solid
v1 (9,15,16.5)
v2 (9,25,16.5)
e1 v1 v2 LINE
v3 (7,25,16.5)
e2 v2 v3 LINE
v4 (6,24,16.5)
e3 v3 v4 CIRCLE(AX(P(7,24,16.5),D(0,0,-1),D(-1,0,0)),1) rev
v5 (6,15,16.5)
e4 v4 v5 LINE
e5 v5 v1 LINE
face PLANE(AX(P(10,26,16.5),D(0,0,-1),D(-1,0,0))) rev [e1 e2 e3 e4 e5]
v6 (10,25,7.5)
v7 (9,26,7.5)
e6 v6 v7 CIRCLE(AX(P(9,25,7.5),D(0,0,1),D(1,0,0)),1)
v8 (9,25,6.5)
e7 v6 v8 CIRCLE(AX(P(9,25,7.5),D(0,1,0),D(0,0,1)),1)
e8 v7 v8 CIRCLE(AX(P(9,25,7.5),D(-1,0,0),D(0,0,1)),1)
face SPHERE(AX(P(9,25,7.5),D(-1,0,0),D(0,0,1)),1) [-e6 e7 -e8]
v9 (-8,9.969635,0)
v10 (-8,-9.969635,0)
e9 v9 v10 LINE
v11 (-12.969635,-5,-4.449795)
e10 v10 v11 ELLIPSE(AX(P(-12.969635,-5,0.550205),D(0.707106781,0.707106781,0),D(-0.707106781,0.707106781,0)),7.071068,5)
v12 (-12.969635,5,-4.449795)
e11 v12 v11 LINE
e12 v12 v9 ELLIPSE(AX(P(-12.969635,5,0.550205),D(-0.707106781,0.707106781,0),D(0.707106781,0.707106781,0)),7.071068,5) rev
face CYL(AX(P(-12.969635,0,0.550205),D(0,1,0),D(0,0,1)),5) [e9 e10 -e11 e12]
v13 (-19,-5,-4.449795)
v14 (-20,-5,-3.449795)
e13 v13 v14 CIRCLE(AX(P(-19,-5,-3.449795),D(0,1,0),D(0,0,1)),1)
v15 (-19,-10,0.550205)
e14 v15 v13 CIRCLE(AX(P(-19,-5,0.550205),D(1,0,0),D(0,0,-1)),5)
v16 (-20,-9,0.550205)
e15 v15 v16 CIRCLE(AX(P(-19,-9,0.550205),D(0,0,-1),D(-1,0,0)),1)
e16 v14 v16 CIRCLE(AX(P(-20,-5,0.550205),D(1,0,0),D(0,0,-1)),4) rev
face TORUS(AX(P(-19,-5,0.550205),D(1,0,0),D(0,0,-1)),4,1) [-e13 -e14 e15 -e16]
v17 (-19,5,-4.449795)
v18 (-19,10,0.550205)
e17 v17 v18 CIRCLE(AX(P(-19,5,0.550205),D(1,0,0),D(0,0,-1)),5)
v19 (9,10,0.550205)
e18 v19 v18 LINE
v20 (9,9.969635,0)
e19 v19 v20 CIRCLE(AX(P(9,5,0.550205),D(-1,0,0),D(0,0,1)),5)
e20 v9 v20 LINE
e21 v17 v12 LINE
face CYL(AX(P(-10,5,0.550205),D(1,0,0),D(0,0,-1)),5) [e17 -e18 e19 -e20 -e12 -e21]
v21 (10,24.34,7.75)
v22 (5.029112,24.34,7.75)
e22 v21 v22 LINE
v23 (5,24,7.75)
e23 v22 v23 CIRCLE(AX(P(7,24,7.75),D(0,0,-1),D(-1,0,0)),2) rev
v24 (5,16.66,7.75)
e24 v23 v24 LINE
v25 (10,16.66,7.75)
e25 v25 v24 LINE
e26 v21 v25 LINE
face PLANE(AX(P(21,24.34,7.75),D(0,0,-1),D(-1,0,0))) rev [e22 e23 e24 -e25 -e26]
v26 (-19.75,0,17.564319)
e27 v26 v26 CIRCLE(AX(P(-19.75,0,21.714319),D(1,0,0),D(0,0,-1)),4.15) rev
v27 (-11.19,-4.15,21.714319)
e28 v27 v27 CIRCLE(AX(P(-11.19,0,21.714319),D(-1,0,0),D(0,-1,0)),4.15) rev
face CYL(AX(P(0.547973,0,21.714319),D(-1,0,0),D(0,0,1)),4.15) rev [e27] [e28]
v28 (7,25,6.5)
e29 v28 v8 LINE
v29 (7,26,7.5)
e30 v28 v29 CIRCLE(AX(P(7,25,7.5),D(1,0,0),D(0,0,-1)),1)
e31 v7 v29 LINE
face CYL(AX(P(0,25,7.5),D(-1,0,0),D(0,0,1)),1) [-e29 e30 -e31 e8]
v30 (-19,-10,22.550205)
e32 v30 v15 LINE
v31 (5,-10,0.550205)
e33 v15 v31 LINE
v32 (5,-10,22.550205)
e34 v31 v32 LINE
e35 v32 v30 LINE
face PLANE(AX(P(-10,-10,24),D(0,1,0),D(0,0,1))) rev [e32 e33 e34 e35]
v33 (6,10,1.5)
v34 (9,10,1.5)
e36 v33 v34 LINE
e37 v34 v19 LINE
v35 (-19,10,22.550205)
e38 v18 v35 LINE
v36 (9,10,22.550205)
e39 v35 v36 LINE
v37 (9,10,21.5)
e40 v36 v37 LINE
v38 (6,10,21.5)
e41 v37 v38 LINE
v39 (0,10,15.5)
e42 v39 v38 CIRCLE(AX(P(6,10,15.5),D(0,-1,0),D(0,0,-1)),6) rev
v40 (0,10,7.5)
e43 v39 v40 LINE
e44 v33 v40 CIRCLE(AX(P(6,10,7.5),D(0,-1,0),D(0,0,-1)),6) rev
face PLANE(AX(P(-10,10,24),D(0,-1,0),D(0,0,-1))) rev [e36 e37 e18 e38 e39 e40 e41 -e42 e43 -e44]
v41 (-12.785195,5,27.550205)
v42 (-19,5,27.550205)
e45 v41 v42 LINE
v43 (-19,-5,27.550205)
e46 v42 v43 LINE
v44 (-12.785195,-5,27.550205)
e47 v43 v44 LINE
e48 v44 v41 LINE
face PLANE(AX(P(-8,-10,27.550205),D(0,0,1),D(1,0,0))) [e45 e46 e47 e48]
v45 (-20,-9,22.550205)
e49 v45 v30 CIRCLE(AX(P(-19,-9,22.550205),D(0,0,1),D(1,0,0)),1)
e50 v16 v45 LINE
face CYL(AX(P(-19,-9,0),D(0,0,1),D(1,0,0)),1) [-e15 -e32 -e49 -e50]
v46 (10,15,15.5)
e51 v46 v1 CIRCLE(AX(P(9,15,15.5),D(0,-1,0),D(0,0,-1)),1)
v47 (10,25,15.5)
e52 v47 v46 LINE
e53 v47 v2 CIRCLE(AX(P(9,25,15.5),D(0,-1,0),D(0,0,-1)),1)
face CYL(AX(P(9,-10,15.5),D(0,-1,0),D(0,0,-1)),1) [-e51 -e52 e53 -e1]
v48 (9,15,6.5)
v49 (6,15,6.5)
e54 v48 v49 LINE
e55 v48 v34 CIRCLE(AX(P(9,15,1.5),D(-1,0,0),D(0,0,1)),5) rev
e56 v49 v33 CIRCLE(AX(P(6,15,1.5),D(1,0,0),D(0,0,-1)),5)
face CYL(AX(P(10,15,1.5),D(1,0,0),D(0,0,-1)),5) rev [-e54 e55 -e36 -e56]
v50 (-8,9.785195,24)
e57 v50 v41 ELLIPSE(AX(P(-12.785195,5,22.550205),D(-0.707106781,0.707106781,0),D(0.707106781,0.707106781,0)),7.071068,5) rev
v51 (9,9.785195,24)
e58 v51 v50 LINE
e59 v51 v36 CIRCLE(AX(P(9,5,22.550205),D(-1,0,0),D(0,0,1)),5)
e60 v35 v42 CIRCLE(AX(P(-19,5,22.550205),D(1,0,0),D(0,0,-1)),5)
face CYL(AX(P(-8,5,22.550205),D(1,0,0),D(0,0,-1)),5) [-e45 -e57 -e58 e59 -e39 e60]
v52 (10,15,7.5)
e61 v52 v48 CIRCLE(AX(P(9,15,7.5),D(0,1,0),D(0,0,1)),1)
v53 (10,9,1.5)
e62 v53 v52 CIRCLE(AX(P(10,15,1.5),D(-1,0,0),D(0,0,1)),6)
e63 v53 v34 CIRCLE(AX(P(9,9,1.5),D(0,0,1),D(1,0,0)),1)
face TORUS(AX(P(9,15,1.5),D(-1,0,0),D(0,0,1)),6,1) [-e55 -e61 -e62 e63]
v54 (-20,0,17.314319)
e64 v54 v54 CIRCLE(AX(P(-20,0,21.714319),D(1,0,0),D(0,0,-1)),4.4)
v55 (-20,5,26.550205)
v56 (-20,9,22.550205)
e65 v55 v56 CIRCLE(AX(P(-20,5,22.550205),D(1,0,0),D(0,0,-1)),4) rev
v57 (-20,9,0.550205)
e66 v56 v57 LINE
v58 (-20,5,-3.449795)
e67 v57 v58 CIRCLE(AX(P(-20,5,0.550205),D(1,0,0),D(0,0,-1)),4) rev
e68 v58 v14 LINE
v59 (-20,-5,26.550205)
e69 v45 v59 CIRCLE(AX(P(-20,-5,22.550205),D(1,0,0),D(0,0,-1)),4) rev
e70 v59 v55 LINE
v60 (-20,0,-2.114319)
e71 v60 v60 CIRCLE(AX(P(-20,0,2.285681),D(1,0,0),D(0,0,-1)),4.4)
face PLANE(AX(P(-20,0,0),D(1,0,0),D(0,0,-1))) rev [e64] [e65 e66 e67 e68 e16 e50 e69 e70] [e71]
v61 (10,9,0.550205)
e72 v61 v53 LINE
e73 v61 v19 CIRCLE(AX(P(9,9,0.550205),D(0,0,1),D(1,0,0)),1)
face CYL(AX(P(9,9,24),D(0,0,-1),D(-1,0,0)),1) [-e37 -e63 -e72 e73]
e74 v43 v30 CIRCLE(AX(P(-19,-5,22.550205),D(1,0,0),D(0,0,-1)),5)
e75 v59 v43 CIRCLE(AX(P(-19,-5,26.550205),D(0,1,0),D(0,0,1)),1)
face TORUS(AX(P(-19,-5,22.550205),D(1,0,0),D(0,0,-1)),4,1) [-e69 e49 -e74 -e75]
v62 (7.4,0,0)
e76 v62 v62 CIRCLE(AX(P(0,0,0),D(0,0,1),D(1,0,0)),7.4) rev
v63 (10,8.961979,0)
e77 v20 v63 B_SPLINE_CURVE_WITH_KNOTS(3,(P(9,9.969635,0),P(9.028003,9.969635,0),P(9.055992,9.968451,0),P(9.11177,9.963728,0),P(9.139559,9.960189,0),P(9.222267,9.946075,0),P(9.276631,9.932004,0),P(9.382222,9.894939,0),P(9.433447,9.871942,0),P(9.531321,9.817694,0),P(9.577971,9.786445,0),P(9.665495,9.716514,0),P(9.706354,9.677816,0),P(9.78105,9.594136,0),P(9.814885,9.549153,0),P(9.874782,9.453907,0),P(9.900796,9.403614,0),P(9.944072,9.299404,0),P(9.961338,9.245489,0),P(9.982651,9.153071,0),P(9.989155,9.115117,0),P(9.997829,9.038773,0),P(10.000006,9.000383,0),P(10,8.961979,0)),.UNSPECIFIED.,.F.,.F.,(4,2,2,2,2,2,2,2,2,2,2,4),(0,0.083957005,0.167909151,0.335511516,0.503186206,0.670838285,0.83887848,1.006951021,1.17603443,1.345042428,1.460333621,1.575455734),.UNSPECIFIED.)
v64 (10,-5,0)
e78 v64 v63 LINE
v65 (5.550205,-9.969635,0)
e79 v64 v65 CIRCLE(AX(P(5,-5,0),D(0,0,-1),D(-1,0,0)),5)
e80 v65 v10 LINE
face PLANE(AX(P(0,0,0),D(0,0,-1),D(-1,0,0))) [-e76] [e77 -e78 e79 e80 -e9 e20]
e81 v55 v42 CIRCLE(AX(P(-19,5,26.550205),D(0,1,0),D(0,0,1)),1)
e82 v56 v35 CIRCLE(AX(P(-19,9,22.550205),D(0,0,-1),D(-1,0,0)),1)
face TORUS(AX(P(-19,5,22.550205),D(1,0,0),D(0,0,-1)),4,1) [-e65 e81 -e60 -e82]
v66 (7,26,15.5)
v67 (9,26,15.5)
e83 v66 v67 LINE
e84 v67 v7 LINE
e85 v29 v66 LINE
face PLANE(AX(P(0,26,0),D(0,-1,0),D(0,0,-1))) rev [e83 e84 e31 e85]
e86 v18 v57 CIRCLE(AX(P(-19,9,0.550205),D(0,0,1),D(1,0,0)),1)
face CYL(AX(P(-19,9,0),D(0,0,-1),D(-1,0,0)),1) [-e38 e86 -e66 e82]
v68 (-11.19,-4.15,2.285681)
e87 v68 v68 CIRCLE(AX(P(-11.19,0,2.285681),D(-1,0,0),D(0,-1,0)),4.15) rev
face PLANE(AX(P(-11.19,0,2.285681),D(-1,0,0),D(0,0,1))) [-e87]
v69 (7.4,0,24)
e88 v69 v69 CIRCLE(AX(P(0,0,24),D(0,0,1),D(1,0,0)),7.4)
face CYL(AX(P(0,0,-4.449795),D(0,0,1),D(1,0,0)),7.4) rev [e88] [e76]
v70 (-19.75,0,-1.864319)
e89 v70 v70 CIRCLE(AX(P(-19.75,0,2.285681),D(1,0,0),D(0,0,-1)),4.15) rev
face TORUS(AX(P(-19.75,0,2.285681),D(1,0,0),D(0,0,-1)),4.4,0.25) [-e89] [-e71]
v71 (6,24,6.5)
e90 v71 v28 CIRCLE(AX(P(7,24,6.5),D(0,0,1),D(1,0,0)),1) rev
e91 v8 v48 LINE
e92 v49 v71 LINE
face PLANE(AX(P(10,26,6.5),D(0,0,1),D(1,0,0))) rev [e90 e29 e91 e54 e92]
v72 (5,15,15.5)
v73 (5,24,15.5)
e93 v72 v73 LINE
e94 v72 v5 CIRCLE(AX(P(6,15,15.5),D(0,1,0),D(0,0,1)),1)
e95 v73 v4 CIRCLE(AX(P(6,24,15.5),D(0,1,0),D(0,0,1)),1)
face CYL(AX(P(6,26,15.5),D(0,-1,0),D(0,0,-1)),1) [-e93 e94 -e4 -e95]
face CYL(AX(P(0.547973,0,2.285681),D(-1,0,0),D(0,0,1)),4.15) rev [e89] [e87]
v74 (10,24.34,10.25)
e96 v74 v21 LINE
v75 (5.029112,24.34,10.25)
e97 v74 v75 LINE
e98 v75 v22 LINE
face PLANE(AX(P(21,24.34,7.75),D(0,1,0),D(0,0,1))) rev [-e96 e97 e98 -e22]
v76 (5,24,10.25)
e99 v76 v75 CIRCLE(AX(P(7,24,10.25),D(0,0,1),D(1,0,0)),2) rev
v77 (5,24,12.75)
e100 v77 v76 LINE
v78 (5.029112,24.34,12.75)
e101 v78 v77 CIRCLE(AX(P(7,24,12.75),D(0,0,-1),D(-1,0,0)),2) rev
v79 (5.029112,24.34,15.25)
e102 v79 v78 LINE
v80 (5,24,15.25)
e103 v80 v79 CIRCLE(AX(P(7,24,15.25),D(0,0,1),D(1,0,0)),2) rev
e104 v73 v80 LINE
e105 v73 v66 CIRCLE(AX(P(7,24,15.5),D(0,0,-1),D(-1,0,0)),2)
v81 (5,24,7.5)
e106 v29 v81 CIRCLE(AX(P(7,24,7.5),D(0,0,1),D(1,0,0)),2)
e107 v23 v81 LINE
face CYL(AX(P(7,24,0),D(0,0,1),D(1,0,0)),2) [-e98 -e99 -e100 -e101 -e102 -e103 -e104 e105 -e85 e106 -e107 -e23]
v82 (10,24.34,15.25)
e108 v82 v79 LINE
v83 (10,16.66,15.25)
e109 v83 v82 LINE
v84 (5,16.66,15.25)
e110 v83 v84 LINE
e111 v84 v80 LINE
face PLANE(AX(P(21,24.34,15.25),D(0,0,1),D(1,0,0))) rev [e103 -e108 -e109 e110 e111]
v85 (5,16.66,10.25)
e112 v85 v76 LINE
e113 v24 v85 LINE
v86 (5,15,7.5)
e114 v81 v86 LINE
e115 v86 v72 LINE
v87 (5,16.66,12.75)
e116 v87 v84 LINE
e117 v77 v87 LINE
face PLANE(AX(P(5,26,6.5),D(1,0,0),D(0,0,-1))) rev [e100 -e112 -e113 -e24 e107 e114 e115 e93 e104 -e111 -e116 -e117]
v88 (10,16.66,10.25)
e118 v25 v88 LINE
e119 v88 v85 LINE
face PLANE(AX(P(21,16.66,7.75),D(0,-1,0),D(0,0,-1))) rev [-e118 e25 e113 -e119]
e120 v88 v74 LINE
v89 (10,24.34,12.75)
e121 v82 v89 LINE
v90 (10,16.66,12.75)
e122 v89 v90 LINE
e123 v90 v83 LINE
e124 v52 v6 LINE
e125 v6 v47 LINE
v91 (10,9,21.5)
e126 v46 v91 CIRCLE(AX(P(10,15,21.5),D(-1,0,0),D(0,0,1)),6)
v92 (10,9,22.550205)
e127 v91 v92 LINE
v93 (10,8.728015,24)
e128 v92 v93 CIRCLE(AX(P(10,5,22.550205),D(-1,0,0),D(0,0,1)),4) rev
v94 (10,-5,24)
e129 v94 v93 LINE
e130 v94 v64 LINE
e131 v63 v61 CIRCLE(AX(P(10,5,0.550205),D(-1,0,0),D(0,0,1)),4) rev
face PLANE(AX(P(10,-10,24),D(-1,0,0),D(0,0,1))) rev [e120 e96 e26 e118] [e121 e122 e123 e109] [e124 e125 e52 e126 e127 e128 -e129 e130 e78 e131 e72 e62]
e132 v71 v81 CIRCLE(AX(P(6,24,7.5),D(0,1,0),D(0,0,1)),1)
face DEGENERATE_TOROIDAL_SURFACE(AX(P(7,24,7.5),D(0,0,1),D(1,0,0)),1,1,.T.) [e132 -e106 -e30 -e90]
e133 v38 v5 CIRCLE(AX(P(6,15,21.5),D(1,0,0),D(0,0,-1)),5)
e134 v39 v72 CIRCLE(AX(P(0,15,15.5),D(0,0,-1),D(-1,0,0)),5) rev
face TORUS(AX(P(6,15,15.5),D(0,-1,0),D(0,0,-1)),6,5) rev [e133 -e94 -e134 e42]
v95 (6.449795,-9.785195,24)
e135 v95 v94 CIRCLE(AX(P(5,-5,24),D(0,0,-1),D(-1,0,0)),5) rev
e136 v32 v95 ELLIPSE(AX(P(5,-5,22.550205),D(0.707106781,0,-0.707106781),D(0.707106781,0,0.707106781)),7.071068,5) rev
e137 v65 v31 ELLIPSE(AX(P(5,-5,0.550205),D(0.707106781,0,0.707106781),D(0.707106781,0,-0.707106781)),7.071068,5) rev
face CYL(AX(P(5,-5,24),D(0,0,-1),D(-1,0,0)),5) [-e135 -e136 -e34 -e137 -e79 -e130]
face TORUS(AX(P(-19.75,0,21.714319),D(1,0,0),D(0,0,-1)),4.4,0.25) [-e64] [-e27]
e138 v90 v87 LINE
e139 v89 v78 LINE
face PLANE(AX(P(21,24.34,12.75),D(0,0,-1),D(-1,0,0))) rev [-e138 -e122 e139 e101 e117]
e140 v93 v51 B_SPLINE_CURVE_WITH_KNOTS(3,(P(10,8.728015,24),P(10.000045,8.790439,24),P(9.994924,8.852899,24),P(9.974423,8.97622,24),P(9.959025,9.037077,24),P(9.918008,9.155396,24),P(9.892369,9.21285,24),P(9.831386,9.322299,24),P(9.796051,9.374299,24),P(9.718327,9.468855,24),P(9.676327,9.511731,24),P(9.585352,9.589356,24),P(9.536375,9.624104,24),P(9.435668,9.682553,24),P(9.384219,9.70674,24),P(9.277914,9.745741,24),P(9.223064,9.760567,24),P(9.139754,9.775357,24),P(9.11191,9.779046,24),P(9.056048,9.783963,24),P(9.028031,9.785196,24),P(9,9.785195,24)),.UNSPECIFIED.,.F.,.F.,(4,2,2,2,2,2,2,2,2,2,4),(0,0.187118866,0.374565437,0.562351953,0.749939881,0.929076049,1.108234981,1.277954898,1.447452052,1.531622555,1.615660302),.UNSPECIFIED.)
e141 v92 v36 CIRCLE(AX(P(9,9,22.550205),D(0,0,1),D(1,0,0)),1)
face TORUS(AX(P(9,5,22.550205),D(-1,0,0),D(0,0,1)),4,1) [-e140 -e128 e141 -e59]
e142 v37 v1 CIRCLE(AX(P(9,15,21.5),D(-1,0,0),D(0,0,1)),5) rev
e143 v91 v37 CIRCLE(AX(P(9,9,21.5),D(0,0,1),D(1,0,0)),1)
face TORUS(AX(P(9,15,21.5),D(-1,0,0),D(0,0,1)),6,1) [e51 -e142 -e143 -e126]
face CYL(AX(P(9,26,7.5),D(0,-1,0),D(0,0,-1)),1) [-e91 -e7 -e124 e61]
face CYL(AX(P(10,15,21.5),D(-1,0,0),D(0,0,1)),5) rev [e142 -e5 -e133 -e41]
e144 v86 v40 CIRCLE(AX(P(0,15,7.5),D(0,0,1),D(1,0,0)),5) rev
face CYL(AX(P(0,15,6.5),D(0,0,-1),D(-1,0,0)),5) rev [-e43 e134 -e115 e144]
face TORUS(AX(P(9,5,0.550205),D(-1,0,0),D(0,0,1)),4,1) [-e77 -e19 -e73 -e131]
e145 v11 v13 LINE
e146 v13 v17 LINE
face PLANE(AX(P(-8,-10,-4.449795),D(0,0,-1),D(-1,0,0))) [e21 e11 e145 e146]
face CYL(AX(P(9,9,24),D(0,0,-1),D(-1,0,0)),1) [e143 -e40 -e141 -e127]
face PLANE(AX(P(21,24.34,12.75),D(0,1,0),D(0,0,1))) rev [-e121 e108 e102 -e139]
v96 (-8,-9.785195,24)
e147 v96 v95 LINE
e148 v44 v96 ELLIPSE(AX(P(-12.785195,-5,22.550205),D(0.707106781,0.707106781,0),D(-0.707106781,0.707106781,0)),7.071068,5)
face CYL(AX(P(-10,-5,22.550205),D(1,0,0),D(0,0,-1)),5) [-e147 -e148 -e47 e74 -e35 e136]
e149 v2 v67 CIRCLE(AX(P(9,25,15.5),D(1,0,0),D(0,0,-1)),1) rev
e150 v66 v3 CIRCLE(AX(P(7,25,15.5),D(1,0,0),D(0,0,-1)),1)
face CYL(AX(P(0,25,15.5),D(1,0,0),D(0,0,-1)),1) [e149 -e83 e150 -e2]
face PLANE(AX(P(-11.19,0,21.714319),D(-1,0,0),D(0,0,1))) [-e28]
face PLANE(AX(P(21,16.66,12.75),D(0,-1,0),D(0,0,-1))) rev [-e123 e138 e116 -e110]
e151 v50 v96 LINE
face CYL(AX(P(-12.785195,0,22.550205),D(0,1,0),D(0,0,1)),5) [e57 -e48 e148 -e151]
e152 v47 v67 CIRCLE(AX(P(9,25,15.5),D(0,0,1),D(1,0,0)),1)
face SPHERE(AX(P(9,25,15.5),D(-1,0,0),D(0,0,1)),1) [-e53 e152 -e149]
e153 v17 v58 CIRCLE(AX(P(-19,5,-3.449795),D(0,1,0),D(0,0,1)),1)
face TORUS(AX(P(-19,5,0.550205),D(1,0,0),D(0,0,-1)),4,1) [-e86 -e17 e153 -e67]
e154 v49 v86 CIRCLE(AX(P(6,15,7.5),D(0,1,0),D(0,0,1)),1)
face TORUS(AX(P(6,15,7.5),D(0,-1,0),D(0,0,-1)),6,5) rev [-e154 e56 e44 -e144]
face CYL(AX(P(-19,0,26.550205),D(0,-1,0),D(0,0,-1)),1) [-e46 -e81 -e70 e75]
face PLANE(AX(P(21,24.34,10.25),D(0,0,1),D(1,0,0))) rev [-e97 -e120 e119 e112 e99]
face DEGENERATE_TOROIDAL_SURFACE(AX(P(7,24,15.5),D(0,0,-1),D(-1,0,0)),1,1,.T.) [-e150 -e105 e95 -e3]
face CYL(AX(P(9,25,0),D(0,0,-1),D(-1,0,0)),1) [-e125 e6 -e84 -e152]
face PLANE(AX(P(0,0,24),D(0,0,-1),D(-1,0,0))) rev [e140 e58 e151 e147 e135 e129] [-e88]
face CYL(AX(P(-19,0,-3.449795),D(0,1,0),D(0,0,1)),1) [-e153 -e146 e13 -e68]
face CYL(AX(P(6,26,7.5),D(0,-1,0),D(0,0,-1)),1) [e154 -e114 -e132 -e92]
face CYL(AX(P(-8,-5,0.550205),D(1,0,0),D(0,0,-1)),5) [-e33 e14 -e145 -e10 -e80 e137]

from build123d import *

# Parameters (mm, degrees)
ESQUISSE1_W                  = 20
ESQUISSE1_H                  = 20
BOSS_EXTRU_1_DEPTH           = 24
BOSS_EXTRU_2_DEPTH           = 10
BOSS_EXTRU_2_DEPTH_BACK      = 2
ESQUISSE2_W                  = 32
ESQUISSE2_H                  = 20.000000000000448
CONG_1_R                     = 5
ENL_V_MAT_EXTRU_1_DEPTH      = 37.18550592888275
ENL_V_MAT_EXTRU_1_DEPTH_BACK = 37.18550592888275
ESQUISSE3_R                  = 7.150000000000047
CONG_4_START                 = -21
CONG_4_DEPTH                 = 31
CONG_5_R                     = 1
CONG_7_R                     = 0.25
EMPREINTE1_START             = -20
EMPREINTE1_OUTLINE_R         = 4
EMPREINTE1_DEPTH             = 8.81
ESQUISSE11_R                 = 4.150000000000001
ENL_V_MAT_EXTRU_6_DEPTH      = 8.81
CONG_20_R                    = 0.25
CONG_15_R                    = 5
ESQUISSE7_R                  = 7.4
ENL_V_MAT_EXTRU_4_DEPTH      = 37.18550609247691
BOSS_EXTRUDE1_DEPTH          = 16
CUT_EXTRUDE1_DEPTH           = 16
FILLET1_R                    = 5
FILLET2_R                    = 2
FILLET3_R                    = 1
FILLET4_R                    = 1
FILLET5_START                = 6
FILLET5_DEPTH                = 4
FILLET5_2_ANGLE              = 90
FILLET6_START                = 6
FILLET6_DEPTH                = 4
FILLET6_2_ANGLE              = 90
FILLET8_R                    = 1


with BuildPart() as part:
    # Esquisse1 → Boss.-Extru.1 (new body)
    with BuildSketch(Plane.XY):
        Rectangle(ESQUISSE1_W, ESQUISSE1_H)
    extrude(amount=BOSS_EXTRU_1_DEPTH)

    # Esquisse2 → Boss.-Extru.2 (add, two sides: drawn at the far end of the back side and taken through both)
    with BuildSketch(Plane.ZY.offset(9.999999999999998).offset(-BOSS_EXTRU_2_DEPTH_BACK)):
        with Locations((11.550204933455245, 3.980016e-11)):
            Rectangle(ESQUISSE2_W, ESQUISSE2_H)
    extrude(amount=BOSS_EXTRU_2_DEPTH + BOSS_EXTRU_2_DEPTH_BACK)

    # Congé1
    # the kernel refuses this fillet: 5 mm, written as the material it takes off along each edge
    with BuildSketch(Plane(origin=(-7.999999999999998, 22.424088128349858, -4.449795066544754), x_dir=(-1, 0, 0), z_dir=(0, -1, 0))) as cong_1_piece_1:
        with BuildLine():
            CenterArc((4.969635251323934, -5), CONG_1_R, 90, 83.68232172298448)
            Line((0, -4.449795066544754), (-0.0993927050264789, -4.438790967875649))
            ThreePointArc((-0.0993927050264789, -4.438790967875649), (-0.09999999999999964, -2.2248975332723777), (-0.09999999999999964, 0))
            Line((-0.09999999999999964, 0), (0, 0.09999999999999964))
            Line((0, 0.09999999999999964), (4.969635251323934, 0.09999999999999964))
            Line((4.969635251323934, 0.09999999999999964), (4.969635251323934, 0))
        make_face()
    extrude(amount=44.848176256620114, mode=Mode.SUBTRACT)
    with BuildSketch(Plane(origin=(-7.999999999999998, -21.962988303740985, 27.550204933455245), x_dir=(2.5e-16, 0, -1), z_dir=(0, 1, 0))) as cong_1_piece_2:
        with BuildLine():
            CenterArc((4.999999999999999, 4.785195321512226), CONG_1_R, 180, 73.1444977745706)
            Line((-1.2e-15, 4.785195321512225), (-0.10000000000000261, 4.785195321512225))
            Line((-0.10000000000000261, 4.785195321512225), (-0.10000000000000142, -3e-17))
            Line((-0.10000000000000142, -3e-17), (3e-17, -0.09999999999999964))
            ThreePointArc((3e-17, -0.09999999999999964), (1.7751024667276205, -0.0999999999999992), (3.52120903212435, -0.09570390643024408))
            Line((3.52120903212435, -0.09570390643024408), (3.5502049334552446, 0))
        make_face()
    extrude(amount=43.92597660756157, mode=Mode.SUBTRACT)

    # Esquisse3 → Enlèv. mat.-Extru.1 (cut, two sides: drawn at the far end of the back side and taken through both)
    with BuildSketch(Plane.XY.offset(24).offset(-ENL_V_MAT_EXTRU_1_DEPTH_BACK)):
        with Locations(Location((0, 0, 0), (0, 0, 180))):
            Circle(ESQUISSE3_R)
    extrude(amount=ENL_V_MAT_EXTRU_1_DEPTH + ENL_V_MAT_EXTRU_1_DEPTH_BACK, mode=Mode.SUBTRACT)

    # Congé4: read off the stored shape, not the designer's step
    # Congé4 outline → Congé4 (cut)
    with BuildSketch(Plane.YZ.offset(CONG_4_START)):
        with BuildLine():
            ThreePointArc((-5, -4.449795067), (-8.535533905, -2.985328972), (-10, 0.550204933))
            Line((-10, 0.550204933), (-10, -4.449795067))
            Line((-10, -4.449795067), (-5, -4.449795067))
        make_face()
        with BuildLine():
            Line((-10, 27.550204933), (-10, 22.550204933))
            ThreePointArc((-10, 22.550204933), (-8.535533906, 26.085738839), (-5, 27.550204933))
            Line((-5, 27.550204933), (-10, 27.550204933))
        make_face()
        with BuildLine():
            ThreePointArc((10, 0.550204933), (8.535533905, -2.985328972), (5, -4.449795067))
            Line((5, -4.449795067), (10, -4.449795067))
            Line((10, -4.449795067), (10, 0.550204933))
        make_face()
        with BuildLine():
            Line((10, 27.550204933), (5, 27.550204933))
            ThreePointArc((5, 27.550204933), (8.535533906, 26.085738839), (10, 22.550204933))
            Line((10, 22.550204933), (10, 27.550204933))
        make_face()
    extrude(amount=CONG_4_DEPTH, mode=Mode.SUBTRACT)

    # Congé5
    cong_5_edges = [part.edges().sort_by_distance(p)[0] for p in [
        (-20, 0, -4.449795066544754),
        (-20, 0, 27.550204933455245),
        (-20, 10.000000000040023, 11.550204933),
        (-20, -9.999999999960423, 11.550204933),
        (-20, 8.535533906, 26.085738839),
        (-20, -8.535533906000001, 26.085738839),
        (-20, 8.535533905, -2.985328971999999),
        (-20, -8.535533905, -2.985328972),
    ]]
    fillet(cong_5_edges, radius=CONG_5_R)

    # Congé7
    cong_7_edges = [part.edges().sort_by_distance(p)[0] for p in [
        (7.150000000000047, -1.75e-15, 24),
        (7.150000000000047, -1.75e-15, 0),
    ]]
    fillet(cong_7_edges, radius=CONG_7_R)

    # Empreinte1: read off the stored shape, not the designer's step
    # Empreinte1 outline → Empreinte1 (cut)
    with BuildSketch(Plane.YZ.offset(EMPREINTE1_START)):
        with Locations((0, 2.285680752)):
            Circle(EMPREINTE1_OUTLINE_R)
        with Locations((0, 21.714319248)):
            Circle(EMPREINTE1_OUTLINE_R)
    extrude(amount=EMPREINTE1_DEPTH, mode=Mode.SUBTRACT)

    # Esquisse11 → Enlèv. mat.-Extru.6 (cut)
    with BuildSketch(Plane.ZY.offset(19.999999999999996)):
        with Locations((2.285680751772461, -6.103752e-11)):
            Circle(ESQUISSE11_R)
        with Locations((21.714319248000876, -5.865054e-11)):
            Circle(ESQUISSE11_R)
    extrude(amount=-ENL_V_MAT_EXTRU_6_DEPTH, mode=Mode.SUBTRACT)

    # Congé20
    cong_20_edges = [part.edges().sort_by_distance(p)[0] for p in [
        (-19.999999999999996, -6.103701e-11, -1.8643192482275404),
        (-19.999999999999996, -5.865003e-11, 17.564319248000874),
    ]]
    fillet(cong_20_edges, radius=CONG_20_R)

    # Congé15
    # the kernel refuses this fillet: 5 mm, written as the material it takes off along each edge
    with BuildSketch(Plane(origin=(10.000000000000002, -9.999999999999998, -11.949795067), x_dir=(-1, 0, 0), z_dir=(0, 0, 1))) as cong_15_piece_1:
        with BuildLine():
            CenterArc((CONG_15_R, -CONG_15_R), CONG_15_R, 90, 90)
            Line((0, -CONG_15_R), (0, 0))
            Line((0, 0), (CONG_15_R, 0))
        make_face()
    extrude(amount=47.00000000000001, mode=Mode.SUBTRACT)

    # Esquisse7 → Enlèv. mat.-Extru.4 (cut, through all)
    with BuildSketch(Plane.XY.offset(24)):
        Circle(ESQUISSE7_R)
    extrude(amount=-ENL_V_MAT_EXTRU_4_DEPTH, mode=Mode.SUBTRACT)

    # Sketch1 → Boss-Extrude1 (add)
    with BuildSketch(Plane(origin=(0, 10.000000000000002, 0), x_dir=(1, 0, 0), z_dir=(0, 1, 0))):
        Polygon((10.000000000000002, -6.5), (5.000000000000002, -6.5), (4.999999999999997, -16.5), (10.000000000000005, -16.5), align=None)
    extrude(amount=BOSS_EXTRUDE1_DEPTH)

    # Sketch2 → Cut-Extrude1 (cut)
    with BuildSketch(Plane.ZY.offset(-5.000000000000004)):
        Polygon((7.7499999999999964, 24.34), (10.249999999999995, 24.34), (10.249999999999995, 16.660000000000007), (7.749999999999998, 16.66), align=None)
        Polygon((12.749999999999998, 24.340000000000003), (15.249999999999998, 24.34), (15.25, 16.660000000000014), (12.749999999999998, 16.660000000000014), align=None)
    extrude(amount=-CUT_EXTRUDE1_DEPTH, mode=Mode.SUBTRACT)

    # Fillet1
    fillet1_edges = [part.edges().sort_by_distance(p)[0] for p in [
        (5, 10.000000000000002, 11.5),
    ]]
    fillet(fillet1_edges, radius=FILLET1_R)

    # Fillet2
    # the kernel refuses this fillet: 2 mm, written as the material it takes off along each edge
    with BuildSketch(Plane(origin=(5.0000000000000036, 26, 1.5), x_dir=(-4.4e-16, -1, 0), z_dir=(-4.4e-16, 0, 1))) as fillet2_piece_1:
        with BuildLine():
            CenterArc((FILLET2_R, FILLET2_R), FILLET2_R, 180, 90)
            Line((-8.9e-16, FILLET2_R), (0, 0))
            Line((0, 0), (FILLET2_R, 0))
        make_face()
    extrude(amount=20, mode=Mode.SUBTRACT)

    # Fillet3
    fillet3_edges = [part.edges().sort_by_distance(p)[0] for p in [
        (8.5, 26, 6.5),
        (3.535533905932739, 11.464466094107284, 6.500000000000002),
        (5.000000000000002, 19.50000000002001, 6.5),
        (5.585786437626905, 25.414213562373096, 6.5),
    ]]
    fillet(fillet3_edges, radius=FILLET3_R)

    # Fillet4
    fillet4_edges = [part.edges().sort_by_distance(p)[0] for p in [
        (3.5355339059327346, 11.464466094107284, 16.5),
        (8.500000000000004, 26, 16.5),
        (4.999999999999997, 19.50000000002001, 16.5),
        (5.585786437626905, 25.414213562373096, 16.5),
    ]]
    fillet(fillet4_edges, radius=FILLET4_R)

    # Fillet5: read off the stored shape, not the designer's step
    # Fillet5 outline → Fillet5 (add)
    with BuildSketch(Plane.YZ.offset(FILLET5_START)):
        with BuildLine():
            ThreePointArc((10, 1.5), (11.464466094, 5.035533906), (15, 6.5))
            Line((15, 6.5), (10, 6.5))
            Line((10, 6.5), (10, 1.5))
        make_face()
    extrude(amount=FILLET5_DEPTH)

    # Fillet5 2 outline → Fillet5 2 (revolve)
    with BuildSketch(Plane(origin=(6, 0, 7.5), x_dir=(-3.8e-16, 0, -1), z_dir=(1, 0, -3.8e-16))):
        with BuildLine():
            Line((1, 10), (6, 10))
            ThreePointArc((6, 10), (2.464466094, 11.464466094), (1, 15))
            Line((1, 15), (1, 10))
        make_face()
    revolve(axis=Axis((6, 0, 7.5), (0, 1, 0)), revolution_arc=FILLET5_2_ANGLE)

    # Fillet6: read off the stored shape, not the designer's step
    # Fillet6 outline → Fillet6 (add)
    with BuildSketch(Plane.YZ.offset(FILLET6_START)):
        with BuildLine():
            Line((10, 16.5), (15, 16.5))
            ThreePointArc((15, 16.5), (11.464466094, 17.964466094), (10, 21.5))
            Line((10, 21.5), (10, 16.5))
        make_face()
    extrude(amount=FILLET6_DEPTH)

    # Fillet6 2 outline → Fillet6 2 (revolve)
    with BuildSketch(Plane(origin=(6, 0, 15.5), x_dir=(-1, 0, -3.2e-16), z_dir=(3.2e-16, 0, -1))):
        with BuildLine():
            Line((1, 10), (6, 10))
            ThreePointArc((6, 10), (2.464466094, 11.464466094), (1, 15))
            Line((1, 15), (1, 10))
        make_face()
    revolve(axis=Axis((6, 0, 15.5), (0, 1, 0)), revolution_arc=FILLET6_2_ANGLE)

    # Fillet8
    fillet8_edges = [part.edges().sort_by_distance(p)[0] for p in [
        (10.000000000000002, 20, 6.5),
        (10.000000000000002, 25.707106781186546, 6.792893218813452),
        (10.000000000000004, 26, 11.5),
        (10.000000000000005, 20, 16.5),
        (10.000000000000002, 25.707106781186546, 16.207106781186546),
        (10.000000000000002, 10.000000000000002, 1.0251024665),
        (10, 11.464466094, 5.0355339059999995),
        (10, 11.464466094, 17.964466094),
        (10.000000000000002, 10.000000000000002, 22.0251024665),
        (10, 9.946007309310238, 23.28301575208052),
        (10, 9.99240304129454, 0.2746838420349517),
    ]]
    fillet(fillet8_edges, radius=FILLET8_R)


solid = part.part
